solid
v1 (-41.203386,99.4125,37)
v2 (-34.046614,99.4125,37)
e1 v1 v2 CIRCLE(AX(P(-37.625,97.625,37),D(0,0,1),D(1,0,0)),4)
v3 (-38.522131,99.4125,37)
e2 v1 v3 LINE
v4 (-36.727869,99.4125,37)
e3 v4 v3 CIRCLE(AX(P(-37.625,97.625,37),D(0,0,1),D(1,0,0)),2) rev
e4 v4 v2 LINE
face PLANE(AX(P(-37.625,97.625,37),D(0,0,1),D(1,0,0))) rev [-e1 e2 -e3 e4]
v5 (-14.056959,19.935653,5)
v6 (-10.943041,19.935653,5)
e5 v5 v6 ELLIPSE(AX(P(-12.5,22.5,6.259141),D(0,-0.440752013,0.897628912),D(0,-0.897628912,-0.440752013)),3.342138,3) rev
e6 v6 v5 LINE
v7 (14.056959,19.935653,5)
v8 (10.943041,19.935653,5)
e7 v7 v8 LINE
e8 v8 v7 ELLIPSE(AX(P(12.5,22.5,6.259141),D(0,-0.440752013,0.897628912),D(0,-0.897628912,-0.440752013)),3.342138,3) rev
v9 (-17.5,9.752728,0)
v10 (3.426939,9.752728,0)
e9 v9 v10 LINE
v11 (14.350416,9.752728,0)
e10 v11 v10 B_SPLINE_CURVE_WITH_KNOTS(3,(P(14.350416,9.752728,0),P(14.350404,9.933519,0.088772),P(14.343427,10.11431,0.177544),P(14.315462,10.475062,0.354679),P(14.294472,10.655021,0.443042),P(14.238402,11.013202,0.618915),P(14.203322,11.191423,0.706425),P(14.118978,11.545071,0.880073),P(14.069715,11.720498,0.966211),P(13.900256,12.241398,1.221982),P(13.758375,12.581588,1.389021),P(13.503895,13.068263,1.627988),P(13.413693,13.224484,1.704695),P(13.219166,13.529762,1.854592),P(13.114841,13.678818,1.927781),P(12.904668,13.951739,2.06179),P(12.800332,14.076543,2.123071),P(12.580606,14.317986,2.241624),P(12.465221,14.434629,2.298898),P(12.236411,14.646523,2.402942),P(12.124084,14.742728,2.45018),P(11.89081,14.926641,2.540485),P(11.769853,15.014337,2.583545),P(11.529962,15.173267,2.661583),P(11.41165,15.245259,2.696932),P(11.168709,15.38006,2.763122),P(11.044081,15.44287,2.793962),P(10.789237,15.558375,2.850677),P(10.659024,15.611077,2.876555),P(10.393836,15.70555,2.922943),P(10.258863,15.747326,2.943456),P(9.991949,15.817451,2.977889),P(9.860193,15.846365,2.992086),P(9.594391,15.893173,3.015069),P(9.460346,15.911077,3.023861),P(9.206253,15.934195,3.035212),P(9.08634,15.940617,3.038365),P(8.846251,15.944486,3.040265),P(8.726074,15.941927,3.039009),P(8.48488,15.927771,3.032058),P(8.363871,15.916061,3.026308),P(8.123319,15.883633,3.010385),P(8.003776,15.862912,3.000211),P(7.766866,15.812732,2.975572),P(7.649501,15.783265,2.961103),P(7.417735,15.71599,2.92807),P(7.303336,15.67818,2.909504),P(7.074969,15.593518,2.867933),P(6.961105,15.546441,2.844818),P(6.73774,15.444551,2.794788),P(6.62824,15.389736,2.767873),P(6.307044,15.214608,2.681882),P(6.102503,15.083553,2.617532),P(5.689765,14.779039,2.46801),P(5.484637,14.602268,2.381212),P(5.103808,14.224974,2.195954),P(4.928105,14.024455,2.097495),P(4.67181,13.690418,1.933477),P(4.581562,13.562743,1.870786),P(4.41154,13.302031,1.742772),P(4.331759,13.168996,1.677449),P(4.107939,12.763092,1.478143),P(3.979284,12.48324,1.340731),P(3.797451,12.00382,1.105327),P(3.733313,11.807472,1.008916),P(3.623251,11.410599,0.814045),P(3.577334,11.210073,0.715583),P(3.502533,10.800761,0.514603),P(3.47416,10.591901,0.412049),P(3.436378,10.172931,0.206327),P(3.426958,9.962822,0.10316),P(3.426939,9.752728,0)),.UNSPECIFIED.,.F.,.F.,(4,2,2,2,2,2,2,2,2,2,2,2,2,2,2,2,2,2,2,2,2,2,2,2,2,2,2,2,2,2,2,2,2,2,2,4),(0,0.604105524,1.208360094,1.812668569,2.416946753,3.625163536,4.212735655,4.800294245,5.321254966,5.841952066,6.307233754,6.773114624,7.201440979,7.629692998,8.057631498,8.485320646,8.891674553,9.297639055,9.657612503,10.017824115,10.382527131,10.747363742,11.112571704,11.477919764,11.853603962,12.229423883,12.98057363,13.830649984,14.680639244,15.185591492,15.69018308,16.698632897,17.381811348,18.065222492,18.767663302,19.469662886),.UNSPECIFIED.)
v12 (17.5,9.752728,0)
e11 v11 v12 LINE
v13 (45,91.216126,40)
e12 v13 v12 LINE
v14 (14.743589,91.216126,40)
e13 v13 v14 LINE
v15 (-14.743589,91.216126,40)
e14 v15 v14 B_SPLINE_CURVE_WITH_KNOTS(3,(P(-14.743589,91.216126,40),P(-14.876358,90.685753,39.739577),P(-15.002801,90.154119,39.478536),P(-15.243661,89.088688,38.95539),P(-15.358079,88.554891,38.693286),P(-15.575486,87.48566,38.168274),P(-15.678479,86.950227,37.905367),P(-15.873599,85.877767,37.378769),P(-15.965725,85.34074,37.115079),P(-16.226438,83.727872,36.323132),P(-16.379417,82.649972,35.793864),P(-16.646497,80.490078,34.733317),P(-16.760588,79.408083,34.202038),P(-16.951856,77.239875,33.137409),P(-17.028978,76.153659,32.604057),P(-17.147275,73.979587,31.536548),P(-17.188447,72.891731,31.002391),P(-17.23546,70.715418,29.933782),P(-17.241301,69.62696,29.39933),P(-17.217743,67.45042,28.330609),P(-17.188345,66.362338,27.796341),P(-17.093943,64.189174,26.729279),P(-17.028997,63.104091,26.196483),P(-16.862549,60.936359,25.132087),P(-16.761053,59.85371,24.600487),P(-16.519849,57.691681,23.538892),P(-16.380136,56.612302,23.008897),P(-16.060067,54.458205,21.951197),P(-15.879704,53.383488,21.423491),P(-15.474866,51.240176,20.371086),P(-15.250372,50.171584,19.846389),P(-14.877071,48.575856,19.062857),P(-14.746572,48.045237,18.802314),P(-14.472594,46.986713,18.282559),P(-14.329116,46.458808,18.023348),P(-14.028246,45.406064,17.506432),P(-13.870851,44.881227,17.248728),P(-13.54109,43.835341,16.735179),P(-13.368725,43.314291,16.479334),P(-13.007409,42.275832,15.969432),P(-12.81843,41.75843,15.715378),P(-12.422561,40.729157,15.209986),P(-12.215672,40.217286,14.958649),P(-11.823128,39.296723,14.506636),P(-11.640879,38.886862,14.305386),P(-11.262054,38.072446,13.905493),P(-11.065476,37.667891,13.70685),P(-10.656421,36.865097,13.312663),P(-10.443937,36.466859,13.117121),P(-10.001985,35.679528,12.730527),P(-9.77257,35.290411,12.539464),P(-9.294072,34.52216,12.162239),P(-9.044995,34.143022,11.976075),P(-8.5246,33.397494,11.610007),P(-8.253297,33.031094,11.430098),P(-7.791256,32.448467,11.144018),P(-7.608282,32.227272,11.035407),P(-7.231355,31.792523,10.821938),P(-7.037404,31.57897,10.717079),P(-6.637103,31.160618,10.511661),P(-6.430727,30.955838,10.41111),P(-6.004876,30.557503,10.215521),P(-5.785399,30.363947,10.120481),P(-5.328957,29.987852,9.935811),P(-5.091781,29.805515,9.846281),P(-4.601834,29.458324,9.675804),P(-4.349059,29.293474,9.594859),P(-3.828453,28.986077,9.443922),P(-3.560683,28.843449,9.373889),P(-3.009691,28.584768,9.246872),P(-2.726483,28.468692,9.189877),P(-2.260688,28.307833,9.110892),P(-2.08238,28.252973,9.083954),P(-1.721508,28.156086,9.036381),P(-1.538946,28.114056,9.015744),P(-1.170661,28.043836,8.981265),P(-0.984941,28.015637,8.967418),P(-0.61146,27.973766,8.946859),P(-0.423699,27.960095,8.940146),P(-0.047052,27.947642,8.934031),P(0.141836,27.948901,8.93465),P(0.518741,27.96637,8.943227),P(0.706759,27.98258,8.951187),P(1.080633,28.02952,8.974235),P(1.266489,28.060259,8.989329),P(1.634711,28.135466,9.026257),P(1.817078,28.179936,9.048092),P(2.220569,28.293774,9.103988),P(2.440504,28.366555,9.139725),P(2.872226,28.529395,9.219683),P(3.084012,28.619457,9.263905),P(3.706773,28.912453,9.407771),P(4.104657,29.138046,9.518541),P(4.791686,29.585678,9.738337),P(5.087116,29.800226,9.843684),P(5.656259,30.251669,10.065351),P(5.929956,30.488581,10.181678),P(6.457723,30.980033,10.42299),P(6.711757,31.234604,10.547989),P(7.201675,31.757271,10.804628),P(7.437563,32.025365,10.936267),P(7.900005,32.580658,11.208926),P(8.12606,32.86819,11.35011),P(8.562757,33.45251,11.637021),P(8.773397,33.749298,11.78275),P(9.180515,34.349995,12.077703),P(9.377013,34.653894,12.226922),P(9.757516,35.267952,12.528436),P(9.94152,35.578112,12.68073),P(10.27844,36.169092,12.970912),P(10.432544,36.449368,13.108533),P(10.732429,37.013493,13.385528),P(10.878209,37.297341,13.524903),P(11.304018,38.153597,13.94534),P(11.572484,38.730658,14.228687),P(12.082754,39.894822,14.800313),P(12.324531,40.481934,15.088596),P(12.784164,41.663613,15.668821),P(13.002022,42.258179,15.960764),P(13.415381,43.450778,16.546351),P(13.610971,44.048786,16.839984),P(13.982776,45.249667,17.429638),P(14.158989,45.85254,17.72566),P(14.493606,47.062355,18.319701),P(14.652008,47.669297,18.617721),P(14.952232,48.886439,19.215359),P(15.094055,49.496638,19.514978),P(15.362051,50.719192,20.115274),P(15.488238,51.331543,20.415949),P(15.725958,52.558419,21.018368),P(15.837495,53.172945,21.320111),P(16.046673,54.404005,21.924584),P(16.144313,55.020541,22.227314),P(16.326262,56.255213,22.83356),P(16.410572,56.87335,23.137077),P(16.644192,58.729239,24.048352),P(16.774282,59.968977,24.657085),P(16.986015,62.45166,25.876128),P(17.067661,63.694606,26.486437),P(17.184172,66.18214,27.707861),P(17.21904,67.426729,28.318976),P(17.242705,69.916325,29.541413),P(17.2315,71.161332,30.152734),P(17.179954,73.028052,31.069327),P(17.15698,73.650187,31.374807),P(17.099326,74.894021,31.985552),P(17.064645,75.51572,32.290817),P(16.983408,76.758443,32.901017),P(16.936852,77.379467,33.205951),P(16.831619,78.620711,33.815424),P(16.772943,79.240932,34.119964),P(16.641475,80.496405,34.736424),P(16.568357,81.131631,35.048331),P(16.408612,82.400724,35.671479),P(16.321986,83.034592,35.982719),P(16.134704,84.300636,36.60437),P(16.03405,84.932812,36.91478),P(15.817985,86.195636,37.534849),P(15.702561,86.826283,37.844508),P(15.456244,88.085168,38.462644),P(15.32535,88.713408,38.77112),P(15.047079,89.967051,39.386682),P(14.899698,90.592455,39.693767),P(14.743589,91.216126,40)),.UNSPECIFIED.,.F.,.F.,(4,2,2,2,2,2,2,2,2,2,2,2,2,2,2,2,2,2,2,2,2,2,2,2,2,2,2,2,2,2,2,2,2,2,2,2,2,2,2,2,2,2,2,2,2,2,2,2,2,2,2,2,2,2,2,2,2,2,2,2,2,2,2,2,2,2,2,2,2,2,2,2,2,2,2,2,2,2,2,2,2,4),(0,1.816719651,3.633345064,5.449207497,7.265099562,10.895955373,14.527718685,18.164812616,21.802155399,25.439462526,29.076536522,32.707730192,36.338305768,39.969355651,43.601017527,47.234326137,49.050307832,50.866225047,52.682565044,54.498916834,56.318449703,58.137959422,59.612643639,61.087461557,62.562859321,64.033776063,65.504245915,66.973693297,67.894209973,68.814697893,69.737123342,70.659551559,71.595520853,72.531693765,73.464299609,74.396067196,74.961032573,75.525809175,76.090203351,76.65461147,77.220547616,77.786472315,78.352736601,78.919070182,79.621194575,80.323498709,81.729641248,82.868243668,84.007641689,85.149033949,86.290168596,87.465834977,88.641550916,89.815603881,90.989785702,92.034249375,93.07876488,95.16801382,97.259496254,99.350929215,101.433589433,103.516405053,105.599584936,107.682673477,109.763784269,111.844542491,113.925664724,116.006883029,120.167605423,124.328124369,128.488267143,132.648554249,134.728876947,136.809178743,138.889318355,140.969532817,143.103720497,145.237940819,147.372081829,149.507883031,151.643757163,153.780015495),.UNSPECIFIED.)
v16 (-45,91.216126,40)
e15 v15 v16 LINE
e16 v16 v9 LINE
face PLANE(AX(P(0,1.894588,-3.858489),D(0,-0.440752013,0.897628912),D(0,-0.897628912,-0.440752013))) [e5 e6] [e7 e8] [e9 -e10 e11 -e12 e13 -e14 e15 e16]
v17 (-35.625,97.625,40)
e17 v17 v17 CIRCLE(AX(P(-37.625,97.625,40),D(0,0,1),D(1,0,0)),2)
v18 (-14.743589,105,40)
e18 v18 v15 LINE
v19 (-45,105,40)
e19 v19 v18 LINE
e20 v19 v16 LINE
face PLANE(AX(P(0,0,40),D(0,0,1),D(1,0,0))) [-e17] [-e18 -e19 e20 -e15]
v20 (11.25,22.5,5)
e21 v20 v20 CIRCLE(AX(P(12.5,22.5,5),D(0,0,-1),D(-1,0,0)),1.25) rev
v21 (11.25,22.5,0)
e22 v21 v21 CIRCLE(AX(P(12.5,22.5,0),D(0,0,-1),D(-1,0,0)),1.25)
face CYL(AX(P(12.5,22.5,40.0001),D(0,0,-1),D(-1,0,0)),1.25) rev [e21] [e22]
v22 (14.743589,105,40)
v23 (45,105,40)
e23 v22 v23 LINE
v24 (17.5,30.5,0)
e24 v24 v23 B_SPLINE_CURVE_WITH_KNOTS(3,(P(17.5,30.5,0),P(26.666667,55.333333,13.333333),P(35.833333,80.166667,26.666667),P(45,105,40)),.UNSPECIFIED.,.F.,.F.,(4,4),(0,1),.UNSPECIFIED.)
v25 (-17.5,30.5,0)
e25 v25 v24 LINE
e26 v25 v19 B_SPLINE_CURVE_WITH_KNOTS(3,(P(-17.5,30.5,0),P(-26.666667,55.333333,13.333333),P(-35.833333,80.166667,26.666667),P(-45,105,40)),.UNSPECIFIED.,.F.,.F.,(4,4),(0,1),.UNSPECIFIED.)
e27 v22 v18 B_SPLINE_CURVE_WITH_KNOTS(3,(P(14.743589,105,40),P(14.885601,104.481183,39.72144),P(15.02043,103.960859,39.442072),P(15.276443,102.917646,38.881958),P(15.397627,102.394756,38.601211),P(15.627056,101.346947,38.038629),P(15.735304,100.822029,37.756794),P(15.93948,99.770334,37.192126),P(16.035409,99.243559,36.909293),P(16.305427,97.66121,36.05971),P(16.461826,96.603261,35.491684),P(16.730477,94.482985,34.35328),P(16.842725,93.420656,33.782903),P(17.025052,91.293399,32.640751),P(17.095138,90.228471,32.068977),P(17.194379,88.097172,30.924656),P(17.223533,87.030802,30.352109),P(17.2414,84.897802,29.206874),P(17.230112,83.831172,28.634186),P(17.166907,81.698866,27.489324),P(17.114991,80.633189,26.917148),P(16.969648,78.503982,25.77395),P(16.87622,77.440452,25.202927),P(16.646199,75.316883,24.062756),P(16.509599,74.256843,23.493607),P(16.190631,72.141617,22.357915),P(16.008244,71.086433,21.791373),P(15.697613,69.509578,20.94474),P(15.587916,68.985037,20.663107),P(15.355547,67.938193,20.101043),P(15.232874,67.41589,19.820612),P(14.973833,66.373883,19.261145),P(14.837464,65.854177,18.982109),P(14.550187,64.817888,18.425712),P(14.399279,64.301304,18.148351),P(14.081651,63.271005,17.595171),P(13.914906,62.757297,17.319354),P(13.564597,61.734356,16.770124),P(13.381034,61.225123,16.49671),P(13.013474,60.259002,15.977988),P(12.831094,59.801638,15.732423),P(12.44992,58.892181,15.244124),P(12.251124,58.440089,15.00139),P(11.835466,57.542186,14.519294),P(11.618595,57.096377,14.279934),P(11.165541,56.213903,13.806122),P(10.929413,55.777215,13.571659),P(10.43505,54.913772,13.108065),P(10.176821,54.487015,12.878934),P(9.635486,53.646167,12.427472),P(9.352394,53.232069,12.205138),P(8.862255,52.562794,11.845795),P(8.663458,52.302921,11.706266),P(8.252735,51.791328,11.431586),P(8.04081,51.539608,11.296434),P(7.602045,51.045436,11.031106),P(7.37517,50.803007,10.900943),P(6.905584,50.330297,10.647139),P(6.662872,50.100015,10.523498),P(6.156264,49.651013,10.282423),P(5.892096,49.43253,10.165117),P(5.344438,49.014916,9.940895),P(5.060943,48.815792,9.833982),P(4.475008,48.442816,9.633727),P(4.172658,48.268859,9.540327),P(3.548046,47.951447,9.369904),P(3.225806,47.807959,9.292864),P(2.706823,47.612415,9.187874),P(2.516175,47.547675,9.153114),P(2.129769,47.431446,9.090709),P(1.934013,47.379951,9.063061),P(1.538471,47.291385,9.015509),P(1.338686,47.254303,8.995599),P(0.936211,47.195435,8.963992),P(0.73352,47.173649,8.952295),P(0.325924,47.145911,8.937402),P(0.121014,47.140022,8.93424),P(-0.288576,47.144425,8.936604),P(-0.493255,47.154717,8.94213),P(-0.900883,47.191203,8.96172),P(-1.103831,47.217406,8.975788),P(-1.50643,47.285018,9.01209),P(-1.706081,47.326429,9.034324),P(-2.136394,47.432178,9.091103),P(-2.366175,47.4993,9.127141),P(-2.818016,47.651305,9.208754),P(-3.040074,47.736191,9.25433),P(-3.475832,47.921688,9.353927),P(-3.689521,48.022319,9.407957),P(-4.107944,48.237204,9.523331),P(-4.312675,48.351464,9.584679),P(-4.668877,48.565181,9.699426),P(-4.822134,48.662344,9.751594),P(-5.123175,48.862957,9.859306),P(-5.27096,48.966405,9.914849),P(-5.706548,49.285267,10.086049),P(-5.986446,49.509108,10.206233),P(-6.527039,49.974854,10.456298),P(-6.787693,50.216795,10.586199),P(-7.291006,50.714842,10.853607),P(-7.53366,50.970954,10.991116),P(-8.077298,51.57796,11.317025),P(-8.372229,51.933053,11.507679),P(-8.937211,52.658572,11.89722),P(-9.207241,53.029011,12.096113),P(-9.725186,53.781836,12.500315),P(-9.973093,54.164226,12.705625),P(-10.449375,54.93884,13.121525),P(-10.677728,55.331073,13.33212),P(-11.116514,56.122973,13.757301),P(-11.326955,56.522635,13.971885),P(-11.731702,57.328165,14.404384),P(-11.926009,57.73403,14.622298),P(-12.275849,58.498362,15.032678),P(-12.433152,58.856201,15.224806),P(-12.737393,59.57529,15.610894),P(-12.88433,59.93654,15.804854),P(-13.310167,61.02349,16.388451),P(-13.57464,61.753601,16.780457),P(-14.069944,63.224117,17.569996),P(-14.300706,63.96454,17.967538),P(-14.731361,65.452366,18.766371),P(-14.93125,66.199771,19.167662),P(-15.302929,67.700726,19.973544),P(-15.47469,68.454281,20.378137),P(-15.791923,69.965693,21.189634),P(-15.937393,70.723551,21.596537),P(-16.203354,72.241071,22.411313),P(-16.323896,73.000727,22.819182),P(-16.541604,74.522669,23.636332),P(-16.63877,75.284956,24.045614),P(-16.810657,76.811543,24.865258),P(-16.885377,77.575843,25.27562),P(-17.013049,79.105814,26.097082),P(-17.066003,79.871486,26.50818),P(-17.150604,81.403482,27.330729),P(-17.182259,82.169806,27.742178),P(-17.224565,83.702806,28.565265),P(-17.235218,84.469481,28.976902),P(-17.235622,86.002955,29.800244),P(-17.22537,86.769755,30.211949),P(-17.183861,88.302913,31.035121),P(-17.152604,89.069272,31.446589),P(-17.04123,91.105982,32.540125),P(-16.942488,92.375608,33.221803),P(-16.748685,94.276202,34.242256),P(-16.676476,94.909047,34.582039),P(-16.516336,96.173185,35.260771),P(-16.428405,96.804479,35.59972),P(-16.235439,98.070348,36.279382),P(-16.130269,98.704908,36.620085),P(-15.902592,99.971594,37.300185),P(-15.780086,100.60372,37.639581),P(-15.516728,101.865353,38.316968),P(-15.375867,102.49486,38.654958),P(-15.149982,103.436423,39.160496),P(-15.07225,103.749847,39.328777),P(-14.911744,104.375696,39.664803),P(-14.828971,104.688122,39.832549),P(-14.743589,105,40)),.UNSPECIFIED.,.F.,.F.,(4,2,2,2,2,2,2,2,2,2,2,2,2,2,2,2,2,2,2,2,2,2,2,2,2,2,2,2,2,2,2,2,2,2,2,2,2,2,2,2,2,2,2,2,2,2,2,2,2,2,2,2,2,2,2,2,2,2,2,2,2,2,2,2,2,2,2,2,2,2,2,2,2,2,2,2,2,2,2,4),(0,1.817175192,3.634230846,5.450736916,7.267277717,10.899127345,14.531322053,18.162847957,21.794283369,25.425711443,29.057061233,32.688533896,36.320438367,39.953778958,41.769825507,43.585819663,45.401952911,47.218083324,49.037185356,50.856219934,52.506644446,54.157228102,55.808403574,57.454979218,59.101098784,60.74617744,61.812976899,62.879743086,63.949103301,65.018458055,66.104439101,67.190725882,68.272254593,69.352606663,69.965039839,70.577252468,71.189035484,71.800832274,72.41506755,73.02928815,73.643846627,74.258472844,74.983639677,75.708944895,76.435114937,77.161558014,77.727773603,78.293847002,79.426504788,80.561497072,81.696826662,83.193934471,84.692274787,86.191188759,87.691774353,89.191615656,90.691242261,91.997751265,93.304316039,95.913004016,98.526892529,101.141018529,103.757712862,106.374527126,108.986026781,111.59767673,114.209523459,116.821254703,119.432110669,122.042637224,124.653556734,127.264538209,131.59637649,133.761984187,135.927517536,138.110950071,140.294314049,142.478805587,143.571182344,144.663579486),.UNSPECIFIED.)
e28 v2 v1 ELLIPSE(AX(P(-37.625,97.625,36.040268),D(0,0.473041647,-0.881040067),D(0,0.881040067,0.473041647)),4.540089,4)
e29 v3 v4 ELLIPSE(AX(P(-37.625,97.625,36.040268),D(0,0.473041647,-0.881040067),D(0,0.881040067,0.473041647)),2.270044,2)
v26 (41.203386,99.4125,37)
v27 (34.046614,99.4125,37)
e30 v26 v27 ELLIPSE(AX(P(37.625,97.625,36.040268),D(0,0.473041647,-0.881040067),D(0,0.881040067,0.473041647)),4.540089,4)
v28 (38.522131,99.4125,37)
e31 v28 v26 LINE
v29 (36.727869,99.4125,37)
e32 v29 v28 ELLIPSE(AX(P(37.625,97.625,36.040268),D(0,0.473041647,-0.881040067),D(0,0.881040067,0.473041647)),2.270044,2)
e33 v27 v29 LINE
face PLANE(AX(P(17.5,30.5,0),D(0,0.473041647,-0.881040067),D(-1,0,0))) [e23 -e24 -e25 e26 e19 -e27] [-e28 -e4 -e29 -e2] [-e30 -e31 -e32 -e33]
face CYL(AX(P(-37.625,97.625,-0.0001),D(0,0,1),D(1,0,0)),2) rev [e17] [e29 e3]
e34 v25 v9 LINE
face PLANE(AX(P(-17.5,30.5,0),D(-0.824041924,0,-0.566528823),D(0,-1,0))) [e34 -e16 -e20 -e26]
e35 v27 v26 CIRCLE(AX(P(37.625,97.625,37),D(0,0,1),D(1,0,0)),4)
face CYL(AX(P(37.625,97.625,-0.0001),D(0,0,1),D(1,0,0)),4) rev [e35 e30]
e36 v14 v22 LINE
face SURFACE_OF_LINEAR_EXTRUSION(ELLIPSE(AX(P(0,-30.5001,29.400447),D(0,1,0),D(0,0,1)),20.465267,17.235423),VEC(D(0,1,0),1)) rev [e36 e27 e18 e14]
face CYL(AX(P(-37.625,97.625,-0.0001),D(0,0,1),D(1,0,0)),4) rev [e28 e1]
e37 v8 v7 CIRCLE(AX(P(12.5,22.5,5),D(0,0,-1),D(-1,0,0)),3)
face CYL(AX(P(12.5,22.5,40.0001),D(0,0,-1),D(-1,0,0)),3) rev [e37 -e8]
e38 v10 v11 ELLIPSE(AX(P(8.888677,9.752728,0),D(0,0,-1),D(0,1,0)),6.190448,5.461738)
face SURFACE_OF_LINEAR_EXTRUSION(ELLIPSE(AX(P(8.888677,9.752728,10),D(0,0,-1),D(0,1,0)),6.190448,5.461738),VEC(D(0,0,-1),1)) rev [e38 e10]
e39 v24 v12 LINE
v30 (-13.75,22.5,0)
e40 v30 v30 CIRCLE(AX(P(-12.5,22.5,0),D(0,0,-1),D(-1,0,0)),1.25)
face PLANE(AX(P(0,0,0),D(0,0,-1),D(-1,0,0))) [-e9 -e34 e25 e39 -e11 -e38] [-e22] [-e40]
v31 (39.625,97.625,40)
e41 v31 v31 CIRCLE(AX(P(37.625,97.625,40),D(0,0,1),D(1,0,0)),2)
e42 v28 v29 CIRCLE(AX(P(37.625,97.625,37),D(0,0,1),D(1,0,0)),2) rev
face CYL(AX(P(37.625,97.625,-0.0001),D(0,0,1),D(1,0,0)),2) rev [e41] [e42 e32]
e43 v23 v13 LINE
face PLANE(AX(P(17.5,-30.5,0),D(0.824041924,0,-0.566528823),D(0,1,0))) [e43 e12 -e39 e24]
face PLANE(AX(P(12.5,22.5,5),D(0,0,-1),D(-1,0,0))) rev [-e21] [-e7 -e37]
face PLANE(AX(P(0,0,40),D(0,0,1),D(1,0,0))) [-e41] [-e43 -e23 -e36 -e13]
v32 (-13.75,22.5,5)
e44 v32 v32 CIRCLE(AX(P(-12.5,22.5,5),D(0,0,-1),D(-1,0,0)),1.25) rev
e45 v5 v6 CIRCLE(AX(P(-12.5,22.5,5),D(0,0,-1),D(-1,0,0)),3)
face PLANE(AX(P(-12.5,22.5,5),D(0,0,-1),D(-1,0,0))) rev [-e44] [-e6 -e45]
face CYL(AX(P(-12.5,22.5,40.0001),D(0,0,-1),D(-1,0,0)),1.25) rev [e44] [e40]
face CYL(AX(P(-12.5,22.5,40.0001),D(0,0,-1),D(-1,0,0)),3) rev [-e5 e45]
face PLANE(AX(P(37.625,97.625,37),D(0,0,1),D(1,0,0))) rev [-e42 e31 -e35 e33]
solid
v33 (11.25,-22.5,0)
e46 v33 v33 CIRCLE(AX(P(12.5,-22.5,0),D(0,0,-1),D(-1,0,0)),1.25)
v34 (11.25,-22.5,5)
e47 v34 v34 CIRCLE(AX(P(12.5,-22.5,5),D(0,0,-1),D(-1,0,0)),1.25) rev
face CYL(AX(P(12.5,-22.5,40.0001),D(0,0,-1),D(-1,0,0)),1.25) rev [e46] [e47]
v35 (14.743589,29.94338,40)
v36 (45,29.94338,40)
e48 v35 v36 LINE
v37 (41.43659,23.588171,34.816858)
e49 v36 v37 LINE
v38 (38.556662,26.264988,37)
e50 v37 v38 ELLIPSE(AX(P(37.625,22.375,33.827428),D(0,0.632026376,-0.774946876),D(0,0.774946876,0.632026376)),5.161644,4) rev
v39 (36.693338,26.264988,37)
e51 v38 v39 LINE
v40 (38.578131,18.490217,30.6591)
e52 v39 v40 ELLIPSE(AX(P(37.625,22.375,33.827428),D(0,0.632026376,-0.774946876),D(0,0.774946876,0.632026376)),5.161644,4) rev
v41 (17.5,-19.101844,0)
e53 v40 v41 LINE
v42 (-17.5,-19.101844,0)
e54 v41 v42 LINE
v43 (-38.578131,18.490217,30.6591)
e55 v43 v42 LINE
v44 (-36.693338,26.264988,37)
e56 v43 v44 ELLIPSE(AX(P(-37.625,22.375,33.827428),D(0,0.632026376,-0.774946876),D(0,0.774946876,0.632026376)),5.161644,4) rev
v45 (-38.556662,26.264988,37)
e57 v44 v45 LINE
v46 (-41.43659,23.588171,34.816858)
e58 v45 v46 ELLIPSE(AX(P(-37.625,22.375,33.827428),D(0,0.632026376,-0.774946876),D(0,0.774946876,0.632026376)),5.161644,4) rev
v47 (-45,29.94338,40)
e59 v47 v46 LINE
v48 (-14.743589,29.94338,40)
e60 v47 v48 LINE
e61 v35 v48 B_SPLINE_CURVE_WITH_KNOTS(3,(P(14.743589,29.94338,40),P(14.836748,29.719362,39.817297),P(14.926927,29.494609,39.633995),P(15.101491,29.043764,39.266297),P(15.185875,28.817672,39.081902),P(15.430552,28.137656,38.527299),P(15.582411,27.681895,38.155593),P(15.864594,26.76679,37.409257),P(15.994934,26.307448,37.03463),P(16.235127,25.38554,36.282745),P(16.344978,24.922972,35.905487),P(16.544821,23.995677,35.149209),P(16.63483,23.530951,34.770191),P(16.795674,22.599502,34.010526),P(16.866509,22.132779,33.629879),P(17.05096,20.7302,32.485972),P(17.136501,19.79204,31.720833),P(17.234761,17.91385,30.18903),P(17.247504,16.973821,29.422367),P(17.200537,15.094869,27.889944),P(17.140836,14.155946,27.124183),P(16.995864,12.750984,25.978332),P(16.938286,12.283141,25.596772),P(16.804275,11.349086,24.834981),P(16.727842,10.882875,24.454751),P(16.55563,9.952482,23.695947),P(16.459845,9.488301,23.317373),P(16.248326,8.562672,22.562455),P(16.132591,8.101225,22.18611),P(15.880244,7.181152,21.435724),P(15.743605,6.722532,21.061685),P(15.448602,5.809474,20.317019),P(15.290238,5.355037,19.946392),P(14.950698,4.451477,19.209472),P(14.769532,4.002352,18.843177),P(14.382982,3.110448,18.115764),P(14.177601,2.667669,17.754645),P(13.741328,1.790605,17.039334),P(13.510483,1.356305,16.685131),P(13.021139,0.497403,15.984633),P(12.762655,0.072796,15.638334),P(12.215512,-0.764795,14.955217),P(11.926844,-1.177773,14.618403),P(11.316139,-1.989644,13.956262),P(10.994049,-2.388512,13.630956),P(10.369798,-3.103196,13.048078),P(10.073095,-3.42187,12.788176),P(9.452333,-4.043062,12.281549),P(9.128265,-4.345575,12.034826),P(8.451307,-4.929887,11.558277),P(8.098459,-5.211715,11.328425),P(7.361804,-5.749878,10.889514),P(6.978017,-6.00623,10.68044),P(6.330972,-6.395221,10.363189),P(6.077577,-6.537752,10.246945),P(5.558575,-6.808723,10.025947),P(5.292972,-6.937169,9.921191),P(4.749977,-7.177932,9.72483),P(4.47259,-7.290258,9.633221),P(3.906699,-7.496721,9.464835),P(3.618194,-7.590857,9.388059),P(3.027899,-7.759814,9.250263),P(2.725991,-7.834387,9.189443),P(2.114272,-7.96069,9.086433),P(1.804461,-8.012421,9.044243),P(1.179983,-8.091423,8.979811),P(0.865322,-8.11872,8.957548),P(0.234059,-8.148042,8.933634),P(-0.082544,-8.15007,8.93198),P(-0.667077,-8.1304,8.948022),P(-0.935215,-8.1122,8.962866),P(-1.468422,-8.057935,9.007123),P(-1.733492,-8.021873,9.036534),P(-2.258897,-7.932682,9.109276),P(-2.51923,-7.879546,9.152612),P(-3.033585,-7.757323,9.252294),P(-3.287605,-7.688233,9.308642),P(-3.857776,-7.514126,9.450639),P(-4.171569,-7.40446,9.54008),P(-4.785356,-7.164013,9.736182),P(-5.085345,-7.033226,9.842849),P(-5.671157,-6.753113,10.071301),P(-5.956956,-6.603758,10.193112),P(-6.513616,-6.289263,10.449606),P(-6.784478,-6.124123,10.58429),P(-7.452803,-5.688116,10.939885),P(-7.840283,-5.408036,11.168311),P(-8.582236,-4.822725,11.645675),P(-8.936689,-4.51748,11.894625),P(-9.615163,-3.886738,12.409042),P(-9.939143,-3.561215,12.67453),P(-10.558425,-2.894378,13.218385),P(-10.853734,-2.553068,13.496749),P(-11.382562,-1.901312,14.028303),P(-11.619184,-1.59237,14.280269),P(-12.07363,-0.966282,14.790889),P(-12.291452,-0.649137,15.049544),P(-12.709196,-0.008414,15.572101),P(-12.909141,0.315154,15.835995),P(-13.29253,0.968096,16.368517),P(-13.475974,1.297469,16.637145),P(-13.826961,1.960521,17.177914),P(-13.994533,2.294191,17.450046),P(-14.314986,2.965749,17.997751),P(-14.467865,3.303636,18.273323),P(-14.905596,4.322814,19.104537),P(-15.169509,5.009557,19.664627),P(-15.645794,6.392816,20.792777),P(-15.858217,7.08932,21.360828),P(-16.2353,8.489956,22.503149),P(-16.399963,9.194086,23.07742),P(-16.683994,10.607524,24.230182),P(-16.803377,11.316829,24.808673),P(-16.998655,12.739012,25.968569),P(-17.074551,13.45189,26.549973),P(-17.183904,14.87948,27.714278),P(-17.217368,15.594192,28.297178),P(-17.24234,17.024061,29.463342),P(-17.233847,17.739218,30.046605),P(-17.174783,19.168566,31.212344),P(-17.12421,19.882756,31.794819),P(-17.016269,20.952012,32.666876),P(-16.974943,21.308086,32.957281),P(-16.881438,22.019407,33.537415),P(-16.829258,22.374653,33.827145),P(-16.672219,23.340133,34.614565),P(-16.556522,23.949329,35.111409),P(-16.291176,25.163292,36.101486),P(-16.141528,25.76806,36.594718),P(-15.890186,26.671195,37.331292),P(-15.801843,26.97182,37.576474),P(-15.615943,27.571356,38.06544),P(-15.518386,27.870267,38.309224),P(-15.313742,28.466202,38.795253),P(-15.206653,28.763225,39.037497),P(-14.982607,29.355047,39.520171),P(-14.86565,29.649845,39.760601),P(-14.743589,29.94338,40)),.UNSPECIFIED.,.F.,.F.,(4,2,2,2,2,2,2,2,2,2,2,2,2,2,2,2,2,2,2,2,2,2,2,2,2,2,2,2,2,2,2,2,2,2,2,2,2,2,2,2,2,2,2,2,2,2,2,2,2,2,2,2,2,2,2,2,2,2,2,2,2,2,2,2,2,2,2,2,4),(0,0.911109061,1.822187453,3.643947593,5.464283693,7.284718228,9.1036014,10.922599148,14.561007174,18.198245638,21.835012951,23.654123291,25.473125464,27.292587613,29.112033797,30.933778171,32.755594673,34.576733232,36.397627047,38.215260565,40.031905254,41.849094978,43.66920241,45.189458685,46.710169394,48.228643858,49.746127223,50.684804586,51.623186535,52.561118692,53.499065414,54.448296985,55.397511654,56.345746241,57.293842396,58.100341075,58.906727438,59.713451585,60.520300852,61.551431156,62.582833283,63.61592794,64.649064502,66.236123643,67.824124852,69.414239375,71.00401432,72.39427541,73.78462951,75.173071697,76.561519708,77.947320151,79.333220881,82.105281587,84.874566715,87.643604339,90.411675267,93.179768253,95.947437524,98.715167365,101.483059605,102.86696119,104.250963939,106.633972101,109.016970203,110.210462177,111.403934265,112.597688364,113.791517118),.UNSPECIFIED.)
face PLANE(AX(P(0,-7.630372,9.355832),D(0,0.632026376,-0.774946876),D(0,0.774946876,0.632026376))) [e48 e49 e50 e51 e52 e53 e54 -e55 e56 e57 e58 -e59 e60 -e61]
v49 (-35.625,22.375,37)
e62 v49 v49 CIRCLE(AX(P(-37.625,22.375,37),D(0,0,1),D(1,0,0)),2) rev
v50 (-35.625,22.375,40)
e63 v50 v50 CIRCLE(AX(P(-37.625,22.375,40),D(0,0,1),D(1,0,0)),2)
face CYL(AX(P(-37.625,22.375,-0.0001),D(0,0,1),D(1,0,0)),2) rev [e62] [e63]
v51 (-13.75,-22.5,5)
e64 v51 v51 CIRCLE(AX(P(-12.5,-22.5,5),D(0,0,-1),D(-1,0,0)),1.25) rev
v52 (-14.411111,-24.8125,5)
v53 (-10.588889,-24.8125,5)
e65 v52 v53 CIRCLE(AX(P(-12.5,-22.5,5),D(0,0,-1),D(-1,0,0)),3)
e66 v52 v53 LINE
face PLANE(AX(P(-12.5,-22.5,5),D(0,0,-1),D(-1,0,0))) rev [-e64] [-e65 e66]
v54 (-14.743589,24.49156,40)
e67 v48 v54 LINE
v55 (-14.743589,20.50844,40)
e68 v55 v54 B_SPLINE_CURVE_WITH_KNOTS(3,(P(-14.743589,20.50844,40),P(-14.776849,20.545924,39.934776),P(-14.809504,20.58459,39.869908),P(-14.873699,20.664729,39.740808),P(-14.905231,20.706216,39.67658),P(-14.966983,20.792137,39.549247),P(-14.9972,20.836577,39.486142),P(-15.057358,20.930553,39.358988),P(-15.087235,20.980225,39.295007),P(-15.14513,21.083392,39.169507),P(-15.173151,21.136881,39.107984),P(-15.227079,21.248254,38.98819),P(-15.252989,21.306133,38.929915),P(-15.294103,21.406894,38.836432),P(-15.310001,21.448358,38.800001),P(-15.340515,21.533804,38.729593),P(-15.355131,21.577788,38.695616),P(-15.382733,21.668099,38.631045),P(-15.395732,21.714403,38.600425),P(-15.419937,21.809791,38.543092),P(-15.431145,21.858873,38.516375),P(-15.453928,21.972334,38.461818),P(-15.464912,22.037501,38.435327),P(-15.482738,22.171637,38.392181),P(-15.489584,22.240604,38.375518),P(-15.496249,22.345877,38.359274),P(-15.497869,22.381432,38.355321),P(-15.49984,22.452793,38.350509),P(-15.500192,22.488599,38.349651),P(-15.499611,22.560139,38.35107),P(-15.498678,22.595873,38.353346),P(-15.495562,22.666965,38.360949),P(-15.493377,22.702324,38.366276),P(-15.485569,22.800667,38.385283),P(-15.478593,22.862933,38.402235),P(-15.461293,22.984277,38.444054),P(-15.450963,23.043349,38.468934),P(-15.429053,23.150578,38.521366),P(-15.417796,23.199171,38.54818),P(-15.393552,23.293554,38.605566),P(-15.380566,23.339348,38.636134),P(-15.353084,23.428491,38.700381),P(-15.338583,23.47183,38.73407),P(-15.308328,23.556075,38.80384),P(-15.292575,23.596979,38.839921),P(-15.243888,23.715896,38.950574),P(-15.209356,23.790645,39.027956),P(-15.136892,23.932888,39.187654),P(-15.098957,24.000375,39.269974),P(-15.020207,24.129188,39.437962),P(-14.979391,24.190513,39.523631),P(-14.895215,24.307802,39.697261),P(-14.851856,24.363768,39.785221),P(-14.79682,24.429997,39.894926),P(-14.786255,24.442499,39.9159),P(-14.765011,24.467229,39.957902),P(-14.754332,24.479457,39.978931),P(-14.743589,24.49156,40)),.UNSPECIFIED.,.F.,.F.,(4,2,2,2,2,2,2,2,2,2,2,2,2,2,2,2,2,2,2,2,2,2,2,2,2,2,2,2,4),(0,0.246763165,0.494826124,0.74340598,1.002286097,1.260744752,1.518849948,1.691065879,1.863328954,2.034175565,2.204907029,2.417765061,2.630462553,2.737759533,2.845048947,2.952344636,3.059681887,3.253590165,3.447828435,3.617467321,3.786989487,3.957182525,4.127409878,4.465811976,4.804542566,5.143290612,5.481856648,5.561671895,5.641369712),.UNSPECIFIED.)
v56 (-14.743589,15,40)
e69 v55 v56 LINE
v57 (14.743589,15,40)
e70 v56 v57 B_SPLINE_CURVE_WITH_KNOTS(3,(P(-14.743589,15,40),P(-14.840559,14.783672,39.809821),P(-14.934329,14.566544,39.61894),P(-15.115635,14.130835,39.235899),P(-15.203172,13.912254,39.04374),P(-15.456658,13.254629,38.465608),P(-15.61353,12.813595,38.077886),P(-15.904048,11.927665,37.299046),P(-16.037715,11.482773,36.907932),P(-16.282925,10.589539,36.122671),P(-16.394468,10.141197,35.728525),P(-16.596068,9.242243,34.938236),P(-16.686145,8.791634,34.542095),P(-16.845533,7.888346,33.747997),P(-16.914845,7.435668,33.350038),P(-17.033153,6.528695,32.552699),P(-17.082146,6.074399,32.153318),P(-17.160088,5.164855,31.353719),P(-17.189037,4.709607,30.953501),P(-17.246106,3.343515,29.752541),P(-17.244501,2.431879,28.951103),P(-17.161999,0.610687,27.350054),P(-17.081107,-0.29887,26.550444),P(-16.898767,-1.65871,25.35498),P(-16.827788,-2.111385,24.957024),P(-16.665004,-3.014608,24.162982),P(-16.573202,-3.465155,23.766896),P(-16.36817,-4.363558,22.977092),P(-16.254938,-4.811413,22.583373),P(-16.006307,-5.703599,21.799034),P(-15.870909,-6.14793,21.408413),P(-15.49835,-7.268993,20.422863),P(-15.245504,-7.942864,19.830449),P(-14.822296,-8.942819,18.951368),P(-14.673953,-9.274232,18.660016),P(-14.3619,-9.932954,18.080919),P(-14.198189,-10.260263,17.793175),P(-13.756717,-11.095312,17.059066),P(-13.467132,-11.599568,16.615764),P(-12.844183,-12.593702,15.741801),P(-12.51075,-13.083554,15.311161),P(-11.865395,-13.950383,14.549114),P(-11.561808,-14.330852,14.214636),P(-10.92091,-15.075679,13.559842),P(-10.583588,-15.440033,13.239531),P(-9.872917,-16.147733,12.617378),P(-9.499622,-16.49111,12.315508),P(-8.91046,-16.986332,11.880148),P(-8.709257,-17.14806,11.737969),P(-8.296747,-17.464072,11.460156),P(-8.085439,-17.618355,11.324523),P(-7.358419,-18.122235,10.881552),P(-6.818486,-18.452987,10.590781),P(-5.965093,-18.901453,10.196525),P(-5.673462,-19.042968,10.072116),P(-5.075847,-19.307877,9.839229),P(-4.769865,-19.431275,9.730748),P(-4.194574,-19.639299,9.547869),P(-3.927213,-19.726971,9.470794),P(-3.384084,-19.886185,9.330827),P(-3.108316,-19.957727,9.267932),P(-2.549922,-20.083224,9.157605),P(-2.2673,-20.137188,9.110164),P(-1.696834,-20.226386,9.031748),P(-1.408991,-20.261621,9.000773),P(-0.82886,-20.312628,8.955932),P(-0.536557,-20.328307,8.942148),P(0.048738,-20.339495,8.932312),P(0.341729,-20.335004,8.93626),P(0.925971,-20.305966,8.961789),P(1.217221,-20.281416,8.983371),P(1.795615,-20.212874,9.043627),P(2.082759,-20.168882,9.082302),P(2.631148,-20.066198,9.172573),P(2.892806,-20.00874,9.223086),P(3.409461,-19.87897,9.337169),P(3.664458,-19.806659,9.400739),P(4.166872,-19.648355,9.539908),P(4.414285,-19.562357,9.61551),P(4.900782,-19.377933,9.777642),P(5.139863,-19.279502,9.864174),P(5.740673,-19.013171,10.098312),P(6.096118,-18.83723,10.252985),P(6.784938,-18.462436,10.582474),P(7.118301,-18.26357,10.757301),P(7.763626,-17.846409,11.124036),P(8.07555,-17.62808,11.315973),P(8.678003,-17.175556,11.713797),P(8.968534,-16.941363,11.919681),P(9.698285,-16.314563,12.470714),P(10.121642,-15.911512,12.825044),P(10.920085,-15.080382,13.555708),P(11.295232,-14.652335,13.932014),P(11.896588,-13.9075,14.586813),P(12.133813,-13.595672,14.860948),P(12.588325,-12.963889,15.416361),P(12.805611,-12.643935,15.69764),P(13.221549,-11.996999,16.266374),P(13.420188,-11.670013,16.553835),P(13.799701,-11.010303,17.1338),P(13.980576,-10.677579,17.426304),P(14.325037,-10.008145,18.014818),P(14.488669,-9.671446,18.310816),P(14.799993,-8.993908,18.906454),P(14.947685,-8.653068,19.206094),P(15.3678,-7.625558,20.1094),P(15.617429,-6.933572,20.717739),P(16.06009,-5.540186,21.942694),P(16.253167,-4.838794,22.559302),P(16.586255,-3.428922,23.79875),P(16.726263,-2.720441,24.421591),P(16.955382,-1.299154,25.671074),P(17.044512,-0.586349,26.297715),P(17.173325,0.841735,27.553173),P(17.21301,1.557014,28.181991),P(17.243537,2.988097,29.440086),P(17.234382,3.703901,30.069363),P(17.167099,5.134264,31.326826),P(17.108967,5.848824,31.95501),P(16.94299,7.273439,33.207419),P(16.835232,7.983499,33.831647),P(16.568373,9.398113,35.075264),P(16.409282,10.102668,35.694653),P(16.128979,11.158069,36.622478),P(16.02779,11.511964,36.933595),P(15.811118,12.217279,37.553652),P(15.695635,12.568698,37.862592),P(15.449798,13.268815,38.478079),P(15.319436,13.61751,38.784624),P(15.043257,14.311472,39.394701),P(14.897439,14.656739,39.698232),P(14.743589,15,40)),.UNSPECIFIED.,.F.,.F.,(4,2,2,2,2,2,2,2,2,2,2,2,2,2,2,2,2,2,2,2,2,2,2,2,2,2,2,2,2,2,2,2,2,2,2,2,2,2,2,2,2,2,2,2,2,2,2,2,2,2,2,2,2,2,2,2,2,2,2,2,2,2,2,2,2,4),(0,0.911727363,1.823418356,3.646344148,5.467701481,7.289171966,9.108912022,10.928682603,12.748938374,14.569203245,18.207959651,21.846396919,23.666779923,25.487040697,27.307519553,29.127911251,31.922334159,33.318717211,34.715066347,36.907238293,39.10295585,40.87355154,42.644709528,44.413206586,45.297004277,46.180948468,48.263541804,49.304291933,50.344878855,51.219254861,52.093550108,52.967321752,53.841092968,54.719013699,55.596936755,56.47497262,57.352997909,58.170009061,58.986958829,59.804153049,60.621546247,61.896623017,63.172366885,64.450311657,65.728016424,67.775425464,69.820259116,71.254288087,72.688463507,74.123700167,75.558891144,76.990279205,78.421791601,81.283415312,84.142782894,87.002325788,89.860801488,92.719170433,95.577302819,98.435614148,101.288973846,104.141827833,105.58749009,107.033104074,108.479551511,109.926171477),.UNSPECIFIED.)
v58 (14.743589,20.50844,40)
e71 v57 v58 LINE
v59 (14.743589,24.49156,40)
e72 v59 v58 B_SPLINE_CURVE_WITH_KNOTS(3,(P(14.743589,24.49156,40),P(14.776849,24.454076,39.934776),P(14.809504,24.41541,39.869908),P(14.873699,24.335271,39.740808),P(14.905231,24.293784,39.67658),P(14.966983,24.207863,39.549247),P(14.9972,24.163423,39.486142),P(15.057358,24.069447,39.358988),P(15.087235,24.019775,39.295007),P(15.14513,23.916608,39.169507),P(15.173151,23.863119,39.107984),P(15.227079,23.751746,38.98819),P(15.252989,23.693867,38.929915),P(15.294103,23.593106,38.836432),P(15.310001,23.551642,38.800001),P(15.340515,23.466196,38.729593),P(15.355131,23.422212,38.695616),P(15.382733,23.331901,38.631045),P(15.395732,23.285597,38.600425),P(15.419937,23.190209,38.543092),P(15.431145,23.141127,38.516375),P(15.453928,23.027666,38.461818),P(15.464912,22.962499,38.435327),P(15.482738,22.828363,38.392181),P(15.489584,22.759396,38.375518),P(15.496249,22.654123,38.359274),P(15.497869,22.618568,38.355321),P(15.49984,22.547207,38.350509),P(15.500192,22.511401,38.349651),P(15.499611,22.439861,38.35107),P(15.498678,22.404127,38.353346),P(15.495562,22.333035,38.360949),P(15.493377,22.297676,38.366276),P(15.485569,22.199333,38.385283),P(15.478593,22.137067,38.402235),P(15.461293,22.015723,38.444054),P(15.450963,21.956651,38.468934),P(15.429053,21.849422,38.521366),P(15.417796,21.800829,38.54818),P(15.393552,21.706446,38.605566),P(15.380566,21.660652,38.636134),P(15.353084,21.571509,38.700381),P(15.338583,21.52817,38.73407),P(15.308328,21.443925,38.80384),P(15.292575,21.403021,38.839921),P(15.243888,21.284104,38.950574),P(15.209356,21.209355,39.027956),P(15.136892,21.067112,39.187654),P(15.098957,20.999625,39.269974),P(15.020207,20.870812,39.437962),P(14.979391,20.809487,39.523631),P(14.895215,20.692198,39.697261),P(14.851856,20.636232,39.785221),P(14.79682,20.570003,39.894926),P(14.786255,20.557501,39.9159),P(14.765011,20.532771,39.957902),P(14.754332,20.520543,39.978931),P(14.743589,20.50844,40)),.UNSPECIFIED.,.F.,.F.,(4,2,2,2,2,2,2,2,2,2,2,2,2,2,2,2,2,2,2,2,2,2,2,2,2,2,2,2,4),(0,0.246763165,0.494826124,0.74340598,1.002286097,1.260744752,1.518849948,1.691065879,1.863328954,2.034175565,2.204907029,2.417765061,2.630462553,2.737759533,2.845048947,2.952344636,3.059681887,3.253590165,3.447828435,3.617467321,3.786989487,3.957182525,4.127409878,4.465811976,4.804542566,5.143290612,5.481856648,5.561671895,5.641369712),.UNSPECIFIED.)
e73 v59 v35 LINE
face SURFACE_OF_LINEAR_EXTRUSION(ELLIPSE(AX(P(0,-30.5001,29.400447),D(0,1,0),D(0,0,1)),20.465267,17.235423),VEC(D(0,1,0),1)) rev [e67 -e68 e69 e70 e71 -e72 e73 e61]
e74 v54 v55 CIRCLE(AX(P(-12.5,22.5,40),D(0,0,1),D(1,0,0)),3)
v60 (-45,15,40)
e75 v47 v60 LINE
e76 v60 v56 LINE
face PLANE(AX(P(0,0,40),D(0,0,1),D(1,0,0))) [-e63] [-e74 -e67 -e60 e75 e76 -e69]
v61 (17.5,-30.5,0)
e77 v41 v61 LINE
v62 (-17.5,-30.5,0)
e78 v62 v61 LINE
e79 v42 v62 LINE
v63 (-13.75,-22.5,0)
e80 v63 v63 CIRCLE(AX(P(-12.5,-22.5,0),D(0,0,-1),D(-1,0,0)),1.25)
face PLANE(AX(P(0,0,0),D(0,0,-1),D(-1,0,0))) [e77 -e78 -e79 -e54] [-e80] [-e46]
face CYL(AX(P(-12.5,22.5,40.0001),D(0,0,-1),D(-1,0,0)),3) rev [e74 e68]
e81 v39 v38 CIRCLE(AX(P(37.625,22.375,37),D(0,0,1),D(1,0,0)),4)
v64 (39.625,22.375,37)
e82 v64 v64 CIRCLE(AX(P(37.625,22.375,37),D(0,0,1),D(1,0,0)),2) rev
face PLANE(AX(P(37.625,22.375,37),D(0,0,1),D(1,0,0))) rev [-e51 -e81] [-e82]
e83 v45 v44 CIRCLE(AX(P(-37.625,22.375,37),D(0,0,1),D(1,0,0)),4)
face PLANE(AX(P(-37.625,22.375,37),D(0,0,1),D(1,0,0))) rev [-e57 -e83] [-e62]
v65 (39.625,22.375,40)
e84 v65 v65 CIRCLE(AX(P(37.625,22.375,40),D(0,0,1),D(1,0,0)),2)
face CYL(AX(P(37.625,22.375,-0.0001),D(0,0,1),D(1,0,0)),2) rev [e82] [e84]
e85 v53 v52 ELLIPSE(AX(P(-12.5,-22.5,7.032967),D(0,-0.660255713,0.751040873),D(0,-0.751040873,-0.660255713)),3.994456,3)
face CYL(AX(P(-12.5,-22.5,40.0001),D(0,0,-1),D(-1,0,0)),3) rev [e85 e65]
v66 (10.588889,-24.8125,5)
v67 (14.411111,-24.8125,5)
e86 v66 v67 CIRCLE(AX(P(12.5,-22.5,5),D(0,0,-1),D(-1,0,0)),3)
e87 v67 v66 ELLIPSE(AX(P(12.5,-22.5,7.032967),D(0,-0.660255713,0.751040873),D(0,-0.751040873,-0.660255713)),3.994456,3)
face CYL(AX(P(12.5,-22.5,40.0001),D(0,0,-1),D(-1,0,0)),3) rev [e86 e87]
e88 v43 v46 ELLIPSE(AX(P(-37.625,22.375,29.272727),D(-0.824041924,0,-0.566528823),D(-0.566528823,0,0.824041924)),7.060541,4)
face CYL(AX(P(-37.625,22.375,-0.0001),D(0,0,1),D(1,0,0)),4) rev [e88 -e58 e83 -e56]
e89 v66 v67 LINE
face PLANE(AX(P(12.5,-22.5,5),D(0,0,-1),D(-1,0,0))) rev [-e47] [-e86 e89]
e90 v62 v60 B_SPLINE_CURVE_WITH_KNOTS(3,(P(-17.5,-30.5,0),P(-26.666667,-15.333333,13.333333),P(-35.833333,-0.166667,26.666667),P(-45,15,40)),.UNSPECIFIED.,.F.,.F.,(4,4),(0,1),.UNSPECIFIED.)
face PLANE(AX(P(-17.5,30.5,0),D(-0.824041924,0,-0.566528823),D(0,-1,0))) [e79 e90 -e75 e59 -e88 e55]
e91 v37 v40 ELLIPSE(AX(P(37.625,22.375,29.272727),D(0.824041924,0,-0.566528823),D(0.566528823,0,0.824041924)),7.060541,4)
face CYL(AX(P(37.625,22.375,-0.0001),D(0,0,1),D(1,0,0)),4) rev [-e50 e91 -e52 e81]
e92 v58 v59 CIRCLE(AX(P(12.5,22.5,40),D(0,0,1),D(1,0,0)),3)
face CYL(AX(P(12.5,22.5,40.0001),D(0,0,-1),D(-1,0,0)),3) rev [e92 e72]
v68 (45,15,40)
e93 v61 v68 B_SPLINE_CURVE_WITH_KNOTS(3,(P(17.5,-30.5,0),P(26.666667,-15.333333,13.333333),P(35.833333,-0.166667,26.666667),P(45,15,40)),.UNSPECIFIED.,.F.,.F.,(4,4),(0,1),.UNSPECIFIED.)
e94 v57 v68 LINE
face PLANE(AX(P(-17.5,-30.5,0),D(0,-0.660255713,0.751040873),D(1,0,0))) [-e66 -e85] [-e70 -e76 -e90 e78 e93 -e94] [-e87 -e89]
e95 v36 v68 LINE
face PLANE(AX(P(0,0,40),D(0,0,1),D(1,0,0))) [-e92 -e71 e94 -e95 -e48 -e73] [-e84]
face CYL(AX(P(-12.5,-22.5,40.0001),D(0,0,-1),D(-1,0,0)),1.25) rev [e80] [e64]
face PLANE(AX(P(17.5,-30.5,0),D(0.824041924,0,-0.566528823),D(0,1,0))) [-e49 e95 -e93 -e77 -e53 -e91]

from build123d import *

# Parameters (mm, degrees)
SKETCH_5_R               = 1.25
CUT_EXTRUDE_1_DEPTH      = 122.037184526
CUT_EXTRUDE_START        = -5
SKETCH_6_R               = 3
CUT_EXTRUDE_2_DEPTH      = 117.037184526
SKETCH_7_R               = 2
CUT_EXTRUDE_3_DEPTH      = 122.037184526
CUT_EXTRUDE_START_2      = -3
SKETCH_8_R               = 4
CUT_EXTRUDE_4_DEPTH      = 119.037184526
CUT_EXTRUDE_5_DEPTH      = 122.037184526
CUT_EXTRUDE_5_DEPTH_BACK = 122.037184526
SKETCH_12_RX             = 20.465266771
SKETCH_12_RY             = 17.235422909
SKETCH_13_RX             = 6.190448296
SKETCH_13_RY             = 5.461738086
CUT_EXTRUDE_6_DEPTH      = 10


with BuildPart() as part:
    # Loft 1: read off the stored shape, not the designer's step
    # Loft 1: loft between two sections, ruled curve by curve
    loft_1_from = [
        Edge.make_line((-17.5, 30.5, 0), (17.5, 30.5, 0)),
        Edge.make_line((17.5, 30.5, 0), (17.5, -30.5, 0)),
        Edge.make_line((-17.5, -30.5, 0), (17.5, -30.5, 0)),
        Edge.make_line((-17.5, 30.5, 0), (-17.5, -30.5, 0)),
    ]
    loft_1_to = [
        Edge.make_line((-45, 105, 40), (45, 105, 40)),
        Edge.make_line((45, 105, 40), (45, 15, 40)),
        Edge.make_line((-45, 15, 40), (45, 15, 40)),
        Edge.make_line((-45, 105, 40), (-45, 15, 40)),
    ]
    loft_1 = Solid(Shell([*[Face.make_surface_from_curves(loft_1_from[k], loft_1_to[k]) for k in range(4)], Face(Wire(loft_1_from)), Face(Wire(loft_1_to))]))
    add(loft_1)

    # 草图5 → 切除-拉伸1 (cut, through all)
    with BuildSketch(Plane(origin=(0, 0, 0), x_dir=(-1, 0, 0), z_dir=(0, 0, -1))):
        with Locations((-12.5, 22.5)):
            Circle(SKETCH_5_R)
        with Locations((12.5, 22.5)):
            Circle(SKETCH_5_R)
        with Locations((12.5, -22.5)):
            Circle(SKETCH_5_R)
        with Locations((-12.5, -22.5)):
            Circle(SKETCH_5_R)
    extrude(amount=-CUT_EXTRUDE_1_DEPTH, mode=Mode.SUBTRACT)

    # 草图6 → 切除-拉伸2 (cut, through all)
    with BuildSketch(Plane(origin=(0, 0, 0), x_dir=(-1, 0, 0), z_dir=(0, 0, -1)).offset(CUT_EXTRUDE_START)):
        with Locations((-12.5, 22.5)):
            Circle(SKETCH_6_R)
        with Locations((12.5, 22.5)):
            Circle(SKETCH_6_R)
        with Locations((-12.5, -22.5)):
            Circle(SKETCH_6_R)
        with Locations((12.5, -22.5)):
            Circle(SKETCH_6_R)
    extrude(amount=-CUT_EXTRUDE_2_DEPTH, mode=Mode.SUBTRACT)

    # 草图7 → 切除-拉伸3 (cut, through all)
    with BuildSketch(Plane.XY.offset(40)):
        with Locations((37.625, 22.375)):
            Circle(SKETCH_7_R)
        with Locations((-37.625, 22.375)):
            Circle(SKETCH_7_R)
        with Locations((-37.625, 97.625)):
            Circle(SKETCH_7_R)
        with Locations((37.625, 97.625)):
            Circle(SKETCH_7_R)
    extrude(amount=-CUT_EXTRUDE_3_DEPTH, mode=Mode.SUBTRACT)

    # 草图8 → 切除-拉伸4 (cut, through all)
    with BuildSketch(Plane.XY.offset(40).offset(CUT_EXTRUDE_START_2)):
        with Locations((-37.625, 97.625)):
            Circle(SKETCH_8_R)
        with Locations((37.625, 97.625)):
            Circle(SKETCH_8_R)
        with Locations((37.625, 22.375)):
            Circle(SKETCH_8_R)
        with Locations((-37.625, 22.375)):
            Circle(SKETCH_8_R)
    extrude(amount=-CUT_EXTRUDE_4_DEPTH, mode=Mode.SUBTRACT)

    # 草图11 → Loft 1 2 section 0
    with BuildSketch(Plane.XY.offset(40)):
        with BuildLine():
            Line((-45, 91.216125502), (45, 91.216125502))
            Line((45, 91.216125502), (45, 29.943379718))
            Line((45, 29.943379718), (-45, 29.943379718))
            Line((-45, 29.943379718), (-45, 91.216125502))
        make_face()
    # 草图9 → Loft 1 2 section 1
    with BuildSketch(Plane(origin=(0, 0, 0), x_dir=(-1, 0, 0), z_dir=(0, 0, -1))):
        with BuildLine():
            Line((-17.5, 9.752727906), (17.5, 9.752727906))
            Line((17.5, 9.752727906), (17.5, -19.101844067))
            Line((17.5, -19.101844067), (-17.5, -19.101844067))
            Line((-17.5, -19.101844067), (-17.5, 9.752727906))
        make_face()
    loft(mode=Mode.SUBTRACT)


with BuildPart() as loft_1_2_piece_1:
    # of the separate pieces the step leaves, piece 1, a body of its own (loft_1_2_pieces)
    add(part.part.solids().sort_by_distance((-17.5, 30.5, 0))[0])


with BuildPart() as loft_1_2_piece_2:
    # of the separate pieces the step leaves, piece 2, a body of its own (loft_1_2_pieces)
    add(part.part.solids().sort_by_distance((-17.5, -19.101844067, 0))[0])


with BuildPart() as cut_extrude_5_tool:
    # 草图12 → 切除-拉伸5 (new, two sides: drawn at the far end of the back side and taken through both)
    with BuildSketch(Plane(origin=(0, 0, 0), x_dir=(1, 0, 0), z_dir=(0, 1, 0)).offset(-CUT_EXTRUDE_5_DEPTH_BACK)):
        with Locations(Location((0, -29.400447007), (0, 0, -90))):
            Ellipse(SKETCH_12_RX, SKETCH_12_RY)
    extrude(amount=CUT_EXTRUDE_5_DEPTH + CUT_EXTRUDE_5_DEPTH_BACK)


with BuildPart() as loft_1_2_piece_1_1:
    add(loft_1_2_piece_1.part)

    # 切除-拉伸5: cut by cut_extrude_5_tool
    add(cut_extrude_5_tool.part, mode=Mode.SUBTRACT)

    # 草图13 → 切除-拉伸6 (cut)
    with BuildSketch(Plane(origin=(0, 0, 0), x_dir=(-1, 0, 0), z_dir=(0, 0, -1))):
        with Locations(Location((-8.888677431, 9.752727906), (0, 0, 90))):
            Ellipse(SKETCH_13_RX, SKETCH_13_RY)
    extrude(amount=-CUT_EXTRUDE_6_DEPTH, mode=Mode.SUBTRACT)


with BuildPart() as loft_1_2_piece_2_1:
    add(loft_1_2_piece_2.part)

    # 切除-拉伸5: cut by cut_extrude_5_tool
    add(cut_extrude_5_tool.part, mode=Mode.SUBTRACT)


solid = Compound([loft_1_2_piece_1_1.part, loft_1_2_piece_2_1.part])
